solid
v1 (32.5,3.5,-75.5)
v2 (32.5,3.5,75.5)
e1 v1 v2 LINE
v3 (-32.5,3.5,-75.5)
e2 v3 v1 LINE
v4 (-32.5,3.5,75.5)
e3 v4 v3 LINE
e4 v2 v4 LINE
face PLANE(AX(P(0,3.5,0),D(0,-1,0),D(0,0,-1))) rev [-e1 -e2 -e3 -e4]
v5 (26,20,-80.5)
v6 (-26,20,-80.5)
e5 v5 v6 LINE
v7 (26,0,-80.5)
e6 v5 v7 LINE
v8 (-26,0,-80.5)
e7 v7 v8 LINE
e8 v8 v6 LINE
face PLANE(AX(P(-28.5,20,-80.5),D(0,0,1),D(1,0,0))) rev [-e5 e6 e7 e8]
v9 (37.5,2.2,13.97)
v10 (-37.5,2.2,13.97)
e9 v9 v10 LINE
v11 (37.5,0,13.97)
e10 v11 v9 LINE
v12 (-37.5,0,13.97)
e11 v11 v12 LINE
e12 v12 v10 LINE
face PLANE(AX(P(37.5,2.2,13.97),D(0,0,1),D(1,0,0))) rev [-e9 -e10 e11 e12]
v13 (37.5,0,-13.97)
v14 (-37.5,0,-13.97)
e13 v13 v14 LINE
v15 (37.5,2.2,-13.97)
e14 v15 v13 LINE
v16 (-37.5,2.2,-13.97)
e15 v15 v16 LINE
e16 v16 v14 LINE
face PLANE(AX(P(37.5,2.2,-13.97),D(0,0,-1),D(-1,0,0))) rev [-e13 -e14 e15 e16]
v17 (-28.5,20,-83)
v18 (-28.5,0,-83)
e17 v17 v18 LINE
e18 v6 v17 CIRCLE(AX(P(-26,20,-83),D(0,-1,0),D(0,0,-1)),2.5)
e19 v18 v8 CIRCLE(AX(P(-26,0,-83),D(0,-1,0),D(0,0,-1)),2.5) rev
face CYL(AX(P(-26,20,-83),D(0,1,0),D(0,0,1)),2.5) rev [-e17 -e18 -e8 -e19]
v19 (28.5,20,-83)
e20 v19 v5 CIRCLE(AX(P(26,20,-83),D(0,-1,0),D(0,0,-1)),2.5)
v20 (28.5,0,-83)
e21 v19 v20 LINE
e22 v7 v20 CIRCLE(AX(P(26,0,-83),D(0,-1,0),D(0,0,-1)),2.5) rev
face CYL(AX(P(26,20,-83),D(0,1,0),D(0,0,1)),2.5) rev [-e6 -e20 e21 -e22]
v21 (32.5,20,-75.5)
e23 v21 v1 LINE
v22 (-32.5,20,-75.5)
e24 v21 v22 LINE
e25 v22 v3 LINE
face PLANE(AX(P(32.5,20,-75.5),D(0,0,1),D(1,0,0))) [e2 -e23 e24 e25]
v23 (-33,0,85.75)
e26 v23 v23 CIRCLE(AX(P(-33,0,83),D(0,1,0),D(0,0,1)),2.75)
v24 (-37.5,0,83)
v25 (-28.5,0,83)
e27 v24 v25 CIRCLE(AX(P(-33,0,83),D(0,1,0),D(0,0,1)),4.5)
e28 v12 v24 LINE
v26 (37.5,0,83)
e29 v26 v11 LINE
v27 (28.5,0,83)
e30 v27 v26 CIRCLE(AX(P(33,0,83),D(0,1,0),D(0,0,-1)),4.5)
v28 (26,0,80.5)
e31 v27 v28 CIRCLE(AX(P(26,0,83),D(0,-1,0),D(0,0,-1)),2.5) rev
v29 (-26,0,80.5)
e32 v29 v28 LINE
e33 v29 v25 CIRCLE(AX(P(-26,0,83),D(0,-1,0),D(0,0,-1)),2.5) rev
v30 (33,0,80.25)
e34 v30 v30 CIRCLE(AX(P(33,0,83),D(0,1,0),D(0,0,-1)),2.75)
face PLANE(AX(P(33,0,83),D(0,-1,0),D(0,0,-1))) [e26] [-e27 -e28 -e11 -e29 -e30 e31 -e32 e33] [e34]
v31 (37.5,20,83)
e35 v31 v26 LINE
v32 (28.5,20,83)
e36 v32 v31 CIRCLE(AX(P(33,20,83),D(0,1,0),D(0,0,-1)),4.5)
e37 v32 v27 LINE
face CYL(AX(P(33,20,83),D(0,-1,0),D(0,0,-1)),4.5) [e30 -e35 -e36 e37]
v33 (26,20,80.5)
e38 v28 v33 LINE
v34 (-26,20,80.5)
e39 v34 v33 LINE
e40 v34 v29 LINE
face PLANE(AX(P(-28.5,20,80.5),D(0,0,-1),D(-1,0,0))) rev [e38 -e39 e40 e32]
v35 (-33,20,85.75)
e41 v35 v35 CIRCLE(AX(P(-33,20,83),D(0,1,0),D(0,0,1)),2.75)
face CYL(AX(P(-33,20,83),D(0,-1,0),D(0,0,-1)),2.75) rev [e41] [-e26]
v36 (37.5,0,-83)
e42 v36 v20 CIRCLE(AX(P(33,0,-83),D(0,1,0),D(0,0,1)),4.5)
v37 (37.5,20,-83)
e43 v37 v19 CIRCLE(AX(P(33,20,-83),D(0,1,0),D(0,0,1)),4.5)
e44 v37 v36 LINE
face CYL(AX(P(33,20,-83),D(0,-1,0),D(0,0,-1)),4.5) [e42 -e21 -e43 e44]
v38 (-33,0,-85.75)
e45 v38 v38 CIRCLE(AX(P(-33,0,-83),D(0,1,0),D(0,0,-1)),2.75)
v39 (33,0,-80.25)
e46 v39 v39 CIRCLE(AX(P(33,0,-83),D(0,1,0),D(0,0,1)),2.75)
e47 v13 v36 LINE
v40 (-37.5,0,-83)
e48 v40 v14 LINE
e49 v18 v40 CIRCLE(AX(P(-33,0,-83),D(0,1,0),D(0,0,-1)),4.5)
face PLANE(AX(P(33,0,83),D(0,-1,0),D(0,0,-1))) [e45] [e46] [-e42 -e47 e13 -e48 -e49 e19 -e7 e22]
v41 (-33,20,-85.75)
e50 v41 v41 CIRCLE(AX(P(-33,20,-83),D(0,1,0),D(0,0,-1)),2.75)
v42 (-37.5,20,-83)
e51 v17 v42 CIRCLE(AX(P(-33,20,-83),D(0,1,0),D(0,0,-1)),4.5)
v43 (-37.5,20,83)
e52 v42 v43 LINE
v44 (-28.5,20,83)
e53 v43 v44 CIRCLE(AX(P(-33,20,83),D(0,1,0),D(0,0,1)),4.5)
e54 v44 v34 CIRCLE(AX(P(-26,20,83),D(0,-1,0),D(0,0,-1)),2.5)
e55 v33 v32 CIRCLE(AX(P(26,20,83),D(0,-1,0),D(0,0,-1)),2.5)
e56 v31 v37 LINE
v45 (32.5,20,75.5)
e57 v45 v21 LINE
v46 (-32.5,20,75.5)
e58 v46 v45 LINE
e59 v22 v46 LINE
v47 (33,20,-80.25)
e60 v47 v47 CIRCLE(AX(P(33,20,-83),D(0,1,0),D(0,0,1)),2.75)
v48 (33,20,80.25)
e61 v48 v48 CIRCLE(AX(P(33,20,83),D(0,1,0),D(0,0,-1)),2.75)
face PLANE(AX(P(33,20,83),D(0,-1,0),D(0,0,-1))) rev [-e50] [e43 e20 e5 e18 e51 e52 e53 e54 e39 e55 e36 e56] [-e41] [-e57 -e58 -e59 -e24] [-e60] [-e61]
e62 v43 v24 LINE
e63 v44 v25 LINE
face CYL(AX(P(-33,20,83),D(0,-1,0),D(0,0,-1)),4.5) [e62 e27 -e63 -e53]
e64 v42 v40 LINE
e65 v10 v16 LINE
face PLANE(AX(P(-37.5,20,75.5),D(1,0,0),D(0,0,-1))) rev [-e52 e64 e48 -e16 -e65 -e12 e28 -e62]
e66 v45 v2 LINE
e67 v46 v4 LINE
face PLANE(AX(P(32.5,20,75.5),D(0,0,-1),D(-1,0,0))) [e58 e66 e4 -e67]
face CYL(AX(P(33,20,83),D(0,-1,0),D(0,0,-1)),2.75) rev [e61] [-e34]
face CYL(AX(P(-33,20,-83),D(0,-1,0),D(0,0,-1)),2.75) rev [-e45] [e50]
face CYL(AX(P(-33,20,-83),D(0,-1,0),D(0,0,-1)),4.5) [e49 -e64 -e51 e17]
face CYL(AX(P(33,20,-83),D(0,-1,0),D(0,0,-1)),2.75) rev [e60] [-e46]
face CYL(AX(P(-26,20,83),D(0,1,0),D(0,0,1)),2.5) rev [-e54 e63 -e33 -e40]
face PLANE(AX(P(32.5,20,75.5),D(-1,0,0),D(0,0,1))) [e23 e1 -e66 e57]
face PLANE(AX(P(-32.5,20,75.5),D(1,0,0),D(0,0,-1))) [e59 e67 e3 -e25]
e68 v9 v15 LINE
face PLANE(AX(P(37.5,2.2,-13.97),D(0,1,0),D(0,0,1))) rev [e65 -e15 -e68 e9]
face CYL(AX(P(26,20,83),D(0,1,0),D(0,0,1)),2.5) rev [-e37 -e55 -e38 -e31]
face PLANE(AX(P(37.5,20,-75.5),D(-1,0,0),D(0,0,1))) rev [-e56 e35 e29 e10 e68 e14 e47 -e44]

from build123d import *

# Parameters (mm, degrees)
SKETCH1_R           = 2.75
SKETCH1_W           = 65
SKETCH1_H           = 151
BOSS_EXTRUDE1_DEPTH = 20
SKETCH3_W           = 65
SKETCH3_H           = 151
BOSS_EXTRUDE2_DEPTH = 3.5
SKETCH4_W           = 27.94
SKETCH4_H           = 2.2
CUT_EXTRUDE1_DEPTH  = 117.966875653
FILLET1_R           = 2.5


with BuildPart() as part:
    # Sketch1 → Boss-Extrude1 (new body)
    with BuildSketch(Plane(origin=(0, 0, 0), x_dir=(1, 0, 0), z_dir=(0, 1, 0))):
        with BuildLine():
            Line((-37.5, 75.5), (-37.5, -75.5))
            Line((-37.5, -75.5), (-37.5, -83))
            ThreePointArc((-37.5, -83), (-33, -87.5), (-28.5, -83))
            Line((-28.5, -83), (-28.5, -80.5))
            Line((-28.5, -80.5), (28.5, -80.5))
            Line((28.5, -80.5), (28.5, -83))
            ThreePointArc((28.5, -83), (33, -87.5), (37.5, -83))
            Line((37.5, -83), (37.5, -75.5))
            Line((37.5, -75.5), (37.5, 75.5))
            Line((37.5, 75.5), (37.5, 83))
            ThreePointArc((37.5, 83), (33, 87.5), (28.5, 83))
            Line((28.5, 83), (28.5, 80.5))
            Line((28.5, 80.5), (-28.5, 80.5))
            Line((-28.5, 80.5), (-28.5, 83))
            ThreePointArc((-28.5, 83), (-33, 87.5), (-37.5, 83))
            Line((-37.5, 83), (-37.5, 75.5))
        make_face()
        with Locations(Location((-33, -83, 0), (0, 0, 270))):
            Circle(SKETCH1_R, mode=Mode.SUBTRACT)
        with Locations(Location((33, -83, 0), (0, 0, 90))):
            Circle(SKETCH1_R, mode=Mode.SUBTRACT)
        with Locations(Location((33, 83, 0), (0, 0, 270))):
            Circle(SKETCH1_R, mode=Mode.SUBTRACT)
        with Locations(Location((-33, 83, 0), (0, 0, 90))):
            Circle(SKETCH1_R, mode=Mode.SUBTRACT)
        Rectangle(SKETCH1_W, SKETCH1_H, mode=Mode.SUBTRACT)
    extrude(amount=BOSS_EXTRUDE1_DEPTH)

    # Sketch3 → Boss-Extrude2 (add)
    with BuildSketch(Plane.XZ):
        Rectangle(SKETCH3_W, SKETCH3_H)
    extrude(amount=-BOSS_EXTRUDE2_DEPTH)

    # Sketch4 → Cut-Extrude1 (cut, through all)
    with BuildSketch(Plane.ZY.offset(37.5)):
        with Locations((0, 1.1)):
            Rectangle(SKETCH4_W, SKETCH4_H)
    extrude(amount=-CUT_EXTRUDE1_DEPTH, mode=Mode.SUBTRACT)

    # Fillet1
    fillet1_edges = [part.edges().sort_by_distance(p)[0] for p in [
        (28.5, 10, 80.5),
        (-28.5, 10, 80.5),
        (28.5, 10, -80.5),
        (-28.5, 10, -80.5),
    ]]
    fillet(fillet1_edges, radius=FILLET1_R - 0.0001)  # a hair under: the kernel refuses the full size


solid = part.part
